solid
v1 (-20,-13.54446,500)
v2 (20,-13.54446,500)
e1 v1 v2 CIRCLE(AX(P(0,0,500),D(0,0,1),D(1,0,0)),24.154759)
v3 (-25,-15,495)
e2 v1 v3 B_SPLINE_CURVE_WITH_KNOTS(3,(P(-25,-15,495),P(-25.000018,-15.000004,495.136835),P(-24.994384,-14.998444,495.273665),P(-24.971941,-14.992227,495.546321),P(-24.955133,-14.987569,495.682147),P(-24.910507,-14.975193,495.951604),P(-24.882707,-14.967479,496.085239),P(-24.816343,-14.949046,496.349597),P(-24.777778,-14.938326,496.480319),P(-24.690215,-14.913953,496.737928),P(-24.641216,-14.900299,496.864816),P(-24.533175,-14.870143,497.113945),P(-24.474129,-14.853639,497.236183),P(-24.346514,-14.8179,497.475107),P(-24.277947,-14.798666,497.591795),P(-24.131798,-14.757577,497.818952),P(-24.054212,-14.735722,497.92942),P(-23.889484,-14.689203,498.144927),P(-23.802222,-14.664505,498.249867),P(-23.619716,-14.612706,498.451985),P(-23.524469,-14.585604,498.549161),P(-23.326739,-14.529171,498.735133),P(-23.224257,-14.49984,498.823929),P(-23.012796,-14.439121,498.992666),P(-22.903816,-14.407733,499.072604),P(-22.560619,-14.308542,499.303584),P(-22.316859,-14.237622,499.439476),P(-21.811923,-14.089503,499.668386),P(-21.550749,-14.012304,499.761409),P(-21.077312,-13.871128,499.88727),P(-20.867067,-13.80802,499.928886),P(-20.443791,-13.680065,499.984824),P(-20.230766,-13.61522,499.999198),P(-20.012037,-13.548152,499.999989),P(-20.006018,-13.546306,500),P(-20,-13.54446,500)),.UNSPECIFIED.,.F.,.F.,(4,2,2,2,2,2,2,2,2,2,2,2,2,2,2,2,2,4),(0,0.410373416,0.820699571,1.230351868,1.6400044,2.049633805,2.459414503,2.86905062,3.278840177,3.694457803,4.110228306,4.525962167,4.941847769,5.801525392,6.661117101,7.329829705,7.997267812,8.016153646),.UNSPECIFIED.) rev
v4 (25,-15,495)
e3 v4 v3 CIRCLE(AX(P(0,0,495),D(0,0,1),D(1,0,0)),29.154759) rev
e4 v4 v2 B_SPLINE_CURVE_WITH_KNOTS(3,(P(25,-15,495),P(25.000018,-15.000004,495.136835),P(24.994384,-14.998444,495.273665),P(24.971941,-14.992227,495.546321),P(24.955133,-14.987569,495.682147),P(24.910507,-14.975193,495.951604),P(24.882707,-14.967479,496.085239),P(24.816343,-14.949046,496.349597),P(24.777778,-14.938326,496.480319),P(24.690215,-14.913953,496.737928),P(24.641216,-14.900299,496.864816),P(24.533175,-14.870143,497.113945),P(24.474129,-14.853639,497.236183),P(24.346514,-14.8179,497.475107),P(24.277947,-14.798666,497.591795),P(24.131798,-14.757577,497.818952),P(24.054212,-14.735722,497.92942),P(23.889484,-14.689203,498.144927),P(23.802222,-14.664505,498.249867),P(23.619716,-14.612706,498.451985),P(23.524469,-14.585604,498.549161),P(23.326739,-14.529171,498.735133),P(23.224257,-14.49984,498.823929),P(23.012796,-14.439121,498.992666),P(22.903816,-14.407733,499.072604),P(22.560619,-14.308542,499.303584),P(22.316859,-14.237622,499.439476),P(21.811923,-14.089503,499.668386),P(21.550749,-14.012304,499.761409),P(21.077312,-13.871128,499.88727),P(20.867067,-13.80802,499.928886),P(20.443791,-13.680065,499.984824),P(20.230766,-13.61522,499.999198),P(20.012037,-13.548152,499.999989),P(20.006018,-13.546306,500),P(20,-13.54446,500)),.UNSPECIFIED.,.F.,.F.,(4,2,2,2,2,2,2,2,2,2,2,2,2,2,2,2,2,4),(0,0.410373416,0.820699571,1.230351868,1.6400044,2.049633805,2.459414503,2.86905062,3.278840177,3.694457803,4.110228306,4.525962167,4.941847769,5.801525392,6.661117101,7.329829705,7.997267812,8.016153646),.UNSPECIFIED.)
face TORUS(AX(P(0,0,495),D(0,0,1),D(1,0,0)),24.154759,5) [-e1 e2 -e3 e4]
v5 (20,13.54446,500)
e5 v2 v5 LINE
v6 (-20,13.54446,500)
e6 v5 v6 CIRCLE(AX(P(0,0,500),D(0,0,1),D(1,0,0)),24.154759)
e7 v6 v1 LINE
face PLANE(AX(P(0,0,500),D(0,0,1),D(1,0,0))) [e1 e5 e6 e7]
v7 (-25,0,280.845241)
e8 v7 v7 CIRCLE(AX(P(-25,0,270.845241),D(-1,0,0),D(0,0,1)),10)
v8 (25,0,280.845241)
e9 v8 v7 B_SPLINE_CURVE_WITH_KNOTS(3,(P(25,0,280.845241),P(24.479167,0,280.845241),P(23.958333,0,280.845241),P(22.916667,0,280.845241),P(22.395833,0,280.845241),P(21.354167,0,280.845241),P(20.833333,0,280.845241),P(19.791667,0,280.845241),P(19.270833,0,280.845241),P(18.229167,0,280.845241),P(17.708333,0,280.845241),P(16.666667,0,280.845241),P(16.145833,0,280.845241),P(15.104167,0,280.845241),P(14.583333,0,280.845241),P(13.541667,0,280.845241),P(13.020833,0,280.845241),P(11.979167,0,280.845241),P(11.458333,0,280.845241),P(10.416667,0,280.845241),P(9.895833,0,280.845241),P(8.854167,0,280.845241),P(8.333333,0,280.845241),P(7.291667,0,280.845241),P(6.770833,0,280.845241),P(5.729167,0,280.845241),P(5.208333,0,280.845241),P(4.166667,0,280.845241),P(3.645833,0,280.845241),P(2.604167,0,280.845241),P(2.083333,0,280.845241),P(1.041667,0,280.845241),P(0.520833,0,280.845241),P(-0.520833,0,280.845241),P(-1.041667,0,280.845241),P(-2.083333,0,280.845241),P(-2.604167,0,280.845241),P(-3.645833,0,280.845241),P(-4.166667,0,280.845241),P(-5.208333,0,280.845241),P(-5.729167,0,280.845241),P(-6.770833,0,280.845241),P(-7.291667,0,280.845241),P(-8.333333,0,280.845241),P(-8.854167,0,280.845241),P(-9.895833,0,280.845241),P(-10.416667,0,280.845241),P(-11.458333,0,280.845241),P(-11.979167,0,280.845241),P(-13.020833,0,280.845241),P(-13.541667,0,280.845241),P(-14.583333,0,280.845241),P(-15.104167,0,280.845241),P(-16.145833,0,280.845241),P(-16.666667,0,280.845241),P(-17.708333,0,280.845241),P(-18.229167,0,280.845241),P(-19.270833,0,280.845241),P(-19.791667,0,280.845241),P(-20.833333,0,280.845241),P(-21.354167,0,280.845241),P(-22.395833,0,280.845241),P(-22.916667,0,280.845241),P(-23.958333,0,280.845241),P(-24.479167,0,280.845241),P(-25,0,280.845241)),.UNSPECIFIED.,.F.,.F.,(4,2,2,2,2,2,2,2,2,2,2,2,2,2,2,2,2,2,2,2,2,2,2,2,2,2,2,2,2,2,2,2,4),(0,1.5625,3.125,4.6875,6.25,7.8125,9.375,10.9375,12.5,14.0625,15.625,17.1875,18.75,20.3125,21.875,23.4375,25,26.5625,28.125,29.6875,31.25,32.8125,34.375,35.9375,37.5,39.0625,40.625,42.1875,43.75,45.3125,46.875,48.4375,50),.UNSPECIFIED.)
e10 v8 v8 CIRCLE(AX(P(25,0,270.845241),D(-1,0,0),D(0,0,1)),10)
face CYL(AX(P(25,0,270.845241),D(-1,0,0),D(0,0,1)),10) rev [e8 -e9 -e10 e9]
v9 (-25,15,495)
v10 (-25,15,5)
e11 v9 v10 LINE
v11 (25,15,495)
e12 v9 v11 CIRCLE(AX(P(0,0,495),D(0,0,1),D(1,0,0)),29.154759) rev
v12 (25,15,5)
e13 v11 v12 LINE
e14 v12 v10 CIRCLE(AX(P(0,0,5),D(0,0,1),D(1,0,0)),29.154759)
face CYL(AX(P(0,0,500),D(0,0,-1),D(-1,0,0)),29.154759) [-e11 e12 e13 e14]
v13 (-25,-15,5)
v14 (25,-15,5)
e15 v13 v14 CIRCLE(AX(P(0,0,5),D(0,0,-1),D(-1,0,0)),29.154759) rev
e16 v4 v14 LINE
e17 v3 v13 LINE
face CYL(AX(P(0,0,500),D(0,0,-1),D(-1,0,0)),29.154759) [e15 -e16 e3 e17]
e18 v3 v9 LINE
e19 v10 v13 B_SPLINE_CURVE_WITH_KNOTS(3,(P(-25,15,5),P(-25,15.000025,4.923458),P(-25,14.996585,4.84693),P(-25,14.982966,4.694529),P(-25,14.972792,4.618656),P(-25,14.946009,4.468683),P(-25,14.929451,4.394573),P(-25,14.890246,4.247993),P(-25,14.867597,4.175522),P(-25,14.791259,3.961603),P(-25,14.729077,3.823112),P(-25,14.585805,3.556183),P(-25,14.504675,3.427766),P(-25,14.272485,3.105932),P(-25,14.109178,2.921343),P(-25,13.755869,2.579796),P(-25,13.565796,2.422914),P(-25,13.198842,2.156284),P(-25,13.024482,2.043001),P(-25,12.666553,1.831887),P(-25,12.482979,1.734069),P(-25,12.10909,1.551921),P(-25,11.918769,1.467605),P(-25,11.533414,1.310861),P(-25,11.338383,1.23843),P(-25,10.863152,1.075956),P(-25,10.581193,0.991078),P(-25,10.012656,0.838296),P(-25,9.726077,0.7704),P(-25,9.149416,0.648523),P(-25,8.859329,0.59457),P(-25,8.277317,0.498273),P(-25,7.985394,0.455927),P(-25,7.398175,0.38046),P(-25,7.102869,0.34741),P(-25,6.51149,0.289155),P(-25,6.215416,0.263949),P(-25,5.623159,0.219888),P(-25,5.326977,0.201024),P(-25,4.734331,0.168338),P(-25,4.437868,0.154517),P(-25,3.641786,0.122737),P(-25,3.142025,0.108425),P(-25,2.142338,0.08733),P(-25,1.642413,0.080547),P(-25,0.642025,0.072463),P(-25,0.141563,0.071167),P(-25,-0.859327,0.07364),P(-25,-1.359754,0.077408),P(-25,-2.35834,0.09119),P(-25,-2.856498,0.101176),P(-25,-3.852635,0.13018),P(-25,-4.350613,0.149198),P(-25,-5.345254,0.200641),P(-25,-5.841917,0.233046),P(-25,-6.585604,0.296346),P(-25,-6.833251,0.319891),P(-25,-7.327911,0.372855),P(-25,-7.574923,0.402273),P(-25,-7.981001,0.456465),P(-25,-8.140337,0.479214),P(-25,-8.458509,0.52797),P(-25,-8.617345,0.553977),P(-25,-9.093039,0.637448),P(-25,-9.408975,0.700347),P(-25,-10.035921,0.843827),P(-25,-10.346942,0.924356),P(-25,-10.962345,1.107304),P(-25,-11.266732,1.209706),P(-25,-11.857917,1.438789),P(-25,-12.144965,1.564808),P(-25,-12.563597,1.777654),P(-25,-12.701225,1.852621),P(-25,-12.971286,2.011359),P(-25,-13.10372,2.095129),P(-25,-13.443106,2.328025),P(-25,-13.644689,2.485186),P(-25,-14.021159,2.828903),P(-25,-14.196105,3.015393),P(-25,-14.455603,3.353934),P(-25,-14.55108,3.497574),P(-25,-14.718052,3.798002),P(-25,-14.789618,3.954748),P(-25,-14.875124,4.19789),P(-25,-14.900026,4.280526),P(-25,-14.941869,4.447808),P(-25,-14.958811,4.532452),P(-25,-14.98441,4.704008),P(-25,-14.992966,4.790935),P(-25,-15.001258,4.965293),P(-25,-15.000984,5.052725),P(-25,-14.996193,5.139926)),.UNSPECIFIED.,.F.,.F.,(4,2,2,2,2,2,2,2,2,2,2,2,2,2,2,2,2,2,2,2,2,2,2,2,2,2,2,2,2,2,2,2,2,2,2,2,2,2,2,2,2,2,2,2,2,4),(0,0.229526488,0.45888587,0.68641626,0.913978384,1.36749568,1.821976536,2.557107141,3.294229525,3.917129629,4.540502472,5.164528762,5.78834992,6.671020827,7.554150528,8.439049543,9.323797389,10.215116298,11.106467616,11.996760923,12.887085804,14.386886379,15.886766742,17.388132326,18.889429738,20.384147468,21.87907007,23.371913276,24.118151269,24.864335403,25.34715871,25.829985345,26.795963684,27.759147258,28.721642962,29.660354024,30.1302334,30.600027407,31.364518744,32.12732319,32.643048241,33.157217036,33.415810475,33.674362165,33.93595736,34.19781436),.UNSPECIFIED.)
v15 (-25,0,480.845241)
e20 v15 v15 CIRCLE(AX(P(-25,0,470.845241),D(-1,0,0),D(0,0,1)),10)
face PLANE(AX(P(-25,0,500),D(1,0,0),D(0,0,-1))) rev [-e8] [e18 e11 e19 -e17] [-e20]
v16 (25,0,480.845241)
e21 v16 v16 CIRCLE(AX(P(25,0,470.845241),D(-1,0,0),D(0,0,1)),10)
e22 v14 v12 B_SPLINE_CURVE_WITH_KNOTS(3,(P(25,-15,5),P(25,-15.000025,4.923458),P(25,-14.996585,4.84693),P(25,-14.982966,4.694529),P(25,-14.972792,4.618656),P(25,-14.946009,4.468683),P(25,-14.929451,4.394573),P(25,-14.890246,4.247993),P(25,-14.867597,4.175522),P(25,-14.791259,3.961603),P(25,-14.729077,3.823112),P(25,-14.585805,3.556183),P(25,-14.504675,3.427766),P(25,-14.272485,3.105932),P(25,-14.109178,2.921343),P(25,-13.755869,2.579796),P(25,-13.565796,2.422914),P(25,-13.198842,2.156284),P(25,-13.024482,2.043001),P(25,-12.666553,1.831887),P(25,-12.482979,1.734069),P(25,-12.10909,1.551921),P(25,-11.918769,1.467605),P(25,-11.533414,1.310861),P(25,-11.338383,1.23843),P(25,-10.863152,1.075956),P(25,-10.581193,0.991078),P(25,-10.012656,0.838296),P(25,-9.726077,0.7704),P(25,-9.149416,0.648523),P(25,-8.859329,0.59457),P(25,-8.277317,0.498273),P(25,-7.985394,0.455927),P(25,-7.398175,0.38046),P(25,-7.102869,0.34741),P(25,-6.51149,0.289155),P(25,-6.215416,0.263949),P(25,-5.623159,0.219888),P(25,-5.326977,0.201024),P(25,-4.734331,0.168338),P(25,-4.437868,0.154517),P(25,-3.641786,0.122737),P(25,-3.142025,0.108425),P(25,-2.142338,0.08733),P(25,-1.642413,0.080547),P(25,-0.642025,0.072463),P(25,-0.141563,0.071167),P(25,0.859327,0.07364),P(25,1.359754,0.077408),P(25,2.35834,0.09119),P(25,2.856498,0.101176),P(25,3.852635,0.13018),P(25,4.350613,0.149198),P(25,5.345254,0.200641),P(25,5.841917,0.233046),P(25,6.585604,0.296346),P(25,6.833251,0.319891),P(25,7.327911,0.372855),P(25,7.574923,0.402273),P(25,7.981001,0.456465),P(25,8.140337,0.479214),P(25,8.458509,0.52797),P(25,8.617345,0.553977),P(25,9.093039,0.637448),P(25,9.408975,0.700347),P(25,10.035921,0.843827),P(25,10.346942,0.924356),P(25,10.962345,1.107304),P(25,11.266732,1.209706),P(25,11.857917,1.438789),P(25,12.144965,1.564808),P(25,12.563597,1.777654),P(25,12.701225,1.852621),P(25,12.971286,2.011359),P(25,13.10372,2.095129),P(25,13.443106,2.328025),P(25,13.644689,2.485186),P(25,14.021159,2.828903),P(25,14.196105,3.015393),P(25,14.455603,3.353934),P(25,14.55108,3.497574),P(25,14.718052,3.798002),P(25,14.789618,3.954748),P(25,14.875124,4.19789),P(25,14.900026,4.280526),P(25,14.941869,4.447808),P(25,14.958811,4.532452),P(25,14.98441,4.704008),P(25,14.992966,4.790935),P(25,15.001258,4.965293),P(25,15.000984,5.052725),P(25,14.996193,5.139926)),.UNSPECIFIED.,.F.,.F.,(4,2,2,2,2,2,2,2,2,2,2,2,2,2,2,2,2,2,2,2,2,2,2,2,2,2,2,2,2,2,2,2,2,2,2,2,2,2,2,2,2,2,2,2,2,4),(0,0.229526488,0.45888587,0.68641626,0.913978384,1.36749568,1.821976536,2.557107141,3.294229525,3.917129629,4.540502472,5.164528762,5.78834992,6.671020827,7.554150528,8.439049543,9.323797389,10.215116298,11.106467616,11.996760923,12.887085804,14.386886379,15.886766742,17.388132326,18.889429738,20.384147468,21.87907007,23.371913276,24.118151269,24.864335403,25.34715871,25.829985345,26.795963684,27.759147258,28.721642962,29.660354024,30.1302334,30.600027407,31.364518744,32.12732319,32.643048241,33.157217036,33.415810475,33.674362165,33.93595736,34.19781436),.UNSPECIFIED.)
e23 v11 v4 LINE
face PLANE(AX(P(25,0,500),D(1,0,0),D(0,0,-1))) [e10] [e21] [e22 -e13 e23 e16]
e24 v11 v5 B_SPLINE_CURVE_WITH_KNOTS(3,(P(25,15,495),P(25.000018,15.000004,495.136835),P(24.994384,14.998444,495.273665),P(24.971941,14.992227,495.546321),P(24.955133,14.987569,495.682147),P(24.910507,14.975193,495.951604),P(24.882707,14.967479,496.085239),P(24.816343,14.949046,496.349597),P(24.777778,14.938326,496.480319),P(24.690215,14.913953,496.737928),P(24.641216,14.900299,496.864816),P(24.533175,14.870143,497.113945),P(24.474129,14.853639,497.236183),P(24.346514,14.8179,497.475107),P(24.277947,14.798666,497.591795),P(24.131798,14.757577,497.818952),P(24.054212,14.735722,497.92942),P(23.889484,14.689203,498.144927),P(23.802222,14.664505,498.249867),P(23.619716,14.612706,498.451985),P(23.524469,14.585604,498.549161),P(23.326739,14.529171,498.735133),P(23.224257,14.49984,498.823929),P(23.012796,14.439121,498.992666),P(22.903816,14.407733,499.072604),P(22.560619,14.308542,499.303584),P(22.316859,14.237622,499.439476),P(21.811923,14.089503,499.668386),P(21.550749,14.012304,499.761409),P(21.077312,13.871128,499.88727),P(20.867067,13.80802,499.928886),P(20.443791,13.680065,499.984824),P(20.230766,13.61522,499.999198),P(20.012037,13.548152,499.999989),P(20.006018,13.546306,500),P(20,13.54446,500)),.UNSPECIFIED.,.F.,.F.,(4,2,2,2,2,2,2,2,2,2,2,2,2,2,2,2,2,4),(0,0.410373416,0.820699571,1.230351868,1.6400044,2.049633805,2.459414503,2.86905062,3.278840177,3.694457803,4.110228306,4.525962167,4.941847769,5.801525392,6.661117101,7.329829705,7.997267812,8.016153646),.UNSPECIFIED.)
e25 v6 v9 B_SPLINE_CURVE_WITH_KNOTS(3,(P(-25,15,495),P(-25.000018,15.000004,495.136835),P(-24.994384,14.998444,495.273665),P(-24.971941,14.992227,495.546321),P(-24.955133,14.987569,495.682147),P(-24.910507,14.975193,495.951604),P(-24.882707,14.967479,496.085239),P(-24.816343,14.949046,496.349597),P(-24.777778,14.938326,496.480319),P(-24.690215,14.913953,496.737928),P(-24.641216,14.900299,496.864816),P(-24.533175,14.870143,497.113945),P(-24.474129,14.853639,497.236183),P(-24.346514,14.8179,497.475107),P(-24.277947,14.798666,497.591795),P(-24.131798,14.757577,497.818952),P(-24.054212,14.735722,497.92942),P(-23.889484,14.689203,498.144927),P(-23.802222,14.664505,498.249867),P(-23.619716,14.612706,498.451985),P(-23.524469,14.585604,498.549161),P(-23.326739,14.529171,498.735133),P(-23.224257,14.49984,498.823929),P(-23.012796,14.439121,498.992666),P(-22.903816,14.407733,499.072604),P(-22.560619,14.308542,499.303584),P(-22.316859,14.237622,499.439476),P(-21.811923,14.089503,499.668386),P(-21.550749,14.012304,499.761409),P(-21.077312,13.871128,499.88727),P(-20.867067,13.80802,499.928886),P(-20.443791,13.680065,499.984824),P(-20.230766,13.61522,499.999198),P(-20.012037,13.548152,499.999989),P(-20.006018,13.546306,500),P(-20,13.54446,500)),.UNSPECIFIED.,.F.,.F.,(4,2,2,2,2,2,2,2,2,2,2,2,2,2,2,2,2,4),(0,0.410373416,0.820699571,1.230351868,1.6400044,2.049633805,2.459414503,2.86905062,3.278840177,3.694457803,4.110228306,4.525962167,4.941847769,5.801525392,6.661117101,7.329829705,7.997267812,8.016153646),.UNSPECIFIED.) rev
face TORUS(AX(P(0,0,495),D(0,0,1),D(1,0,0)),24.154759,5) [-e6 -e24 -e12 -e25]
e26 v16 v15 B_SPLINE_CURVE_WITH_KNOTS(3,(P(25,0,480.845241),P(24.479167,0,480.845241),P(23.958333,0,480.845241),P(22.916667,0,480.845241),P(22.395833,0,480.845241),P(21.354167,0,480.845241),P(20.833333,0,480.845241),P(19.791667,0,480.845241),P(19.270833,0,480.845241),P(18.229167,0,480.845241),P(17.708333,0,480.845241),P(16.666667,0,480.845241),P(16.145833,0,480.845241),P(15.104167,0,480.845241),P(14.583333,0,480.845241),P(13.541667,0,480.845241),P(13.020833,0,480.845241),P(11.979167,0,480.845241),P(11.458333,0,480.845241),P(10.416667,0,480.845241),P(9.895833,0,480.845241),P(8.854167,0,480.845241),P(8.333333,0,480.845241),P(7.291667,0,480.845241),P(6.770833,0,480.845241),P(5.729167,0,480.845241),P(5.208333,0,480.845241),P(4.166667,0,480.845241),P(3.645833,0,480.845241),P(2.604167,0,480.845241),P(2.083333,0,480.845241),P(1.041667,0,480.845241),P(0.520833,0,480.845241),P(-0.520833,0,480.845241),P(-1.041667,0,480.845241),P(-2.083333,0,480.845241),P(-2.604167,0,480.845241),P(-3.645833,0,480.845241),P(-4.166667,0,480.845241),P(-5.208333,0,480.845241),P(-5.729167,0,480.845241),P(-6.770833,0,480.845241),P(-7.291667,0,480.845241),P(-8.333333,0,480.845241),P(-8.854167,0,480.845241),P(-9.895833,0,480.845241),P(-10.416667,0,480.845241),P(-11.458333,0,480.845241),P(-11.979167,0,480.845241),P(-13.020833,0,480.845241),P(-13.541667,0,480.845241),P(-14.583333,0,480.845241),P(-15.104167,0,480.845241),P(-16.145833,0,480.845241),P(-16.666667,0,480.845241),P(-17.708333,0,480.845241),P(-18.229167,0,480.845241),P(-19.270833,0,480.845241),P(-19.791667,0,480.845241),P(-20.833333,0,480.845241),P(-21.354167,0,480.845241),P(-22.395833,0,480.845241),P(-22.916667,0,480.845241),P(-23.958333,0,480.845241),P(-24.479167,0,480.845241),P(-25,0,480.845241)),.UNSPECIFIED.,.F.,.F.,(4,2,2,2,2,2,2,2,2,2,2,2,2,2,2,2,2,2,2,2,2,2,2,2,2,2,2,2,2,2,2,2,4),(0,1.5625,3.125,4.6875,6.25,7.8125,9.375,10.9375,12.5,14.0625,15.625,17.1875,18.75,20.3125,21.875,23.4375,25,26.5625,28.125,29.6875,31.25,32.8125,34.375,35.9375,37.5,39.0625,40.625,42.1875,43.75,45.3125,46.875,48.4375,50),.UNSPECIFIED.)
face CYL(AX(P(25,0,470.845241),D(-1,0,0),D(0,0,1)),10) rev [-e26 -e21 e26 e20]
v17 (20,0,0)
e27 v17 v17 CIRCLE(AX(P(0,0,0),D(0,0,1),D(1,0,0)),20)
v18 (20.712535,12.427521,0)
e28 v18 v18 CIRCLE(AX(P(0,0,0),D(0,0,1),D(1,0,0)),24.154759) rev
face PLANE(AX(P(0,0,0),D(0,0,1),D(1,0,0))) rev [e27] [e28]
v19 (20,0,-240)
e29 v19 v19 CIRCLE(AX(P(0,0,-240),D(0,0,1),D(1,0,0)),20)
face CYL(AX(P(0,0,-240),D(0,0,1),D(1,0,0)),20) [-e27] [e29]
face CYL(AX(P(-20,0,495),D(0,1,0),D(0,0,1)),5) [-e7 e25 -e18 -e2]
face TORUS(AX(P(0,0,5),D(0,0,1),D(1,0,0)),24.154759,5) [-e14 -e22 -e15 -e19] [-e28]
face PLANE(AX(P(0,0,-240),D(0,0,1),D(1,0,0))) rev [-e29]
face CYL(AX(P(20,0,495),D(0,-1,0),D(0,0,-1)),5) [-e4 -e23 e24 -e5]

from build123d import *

# Parameters (mm, degrees)
ESQUISSE1_R             = 20
BOSS_EXTRU_1_DEPTH      = 500
ESQUISSE1_4_R           = 20
BOSS_EXTRU_2_DEPTH      = 240
ESQUISSE2_R             = 10
ENL_V_MAT_EXTRU_1_DEPTH = 504.338852067
CONG_1_R                = 5


with BuildPart() as part:
    # Esquisse1 → Boss.-Extru.1 (new body)
    # profile 1 of 2: a face of its own
    with BuildSketch(Plane.XY):
        with BuildLine():
            ThreePointArc((25, 15), (0, 29.154759474), (-25, 15))
            Line((-25, 15), (-25, -15))
            ThreePointArc((-25, -15), (0, -29.154759474), (25, -15))
            Line((25, -15), (25, 15))
        make_face()
        Circle(ESQUISSE1_R, mode=Mode.SUBTRACT)
    # profile 2 of 2: a face of its own
    with BuildSketch(Plane.XY):
        Circle(ESQUISSE1_R)
    extrude(amount=BOSS_EXTRU_1_DEPTH)

    # Esquisse1<4> → Boss.-Extru.2 (add)
    with BuildSketch(Plane.XY):
        Circle(ESQUISSE1_4_R)
    extrude(amount=-BOSS_EXTRU_2_DEPTH)

    # Esquisse2 → Enlèv. mat.-Extru.1 (cut, through all)
    with BuildSketch(Plane.ZY.offset(25)):
        with Locations((470.845240526, 0)):
            Circle(ESQUISSE2_R)
        with Locations((270.845240526, 0)):
            Circle(ESQUISSE2_R)
    extrude(amount=-ENL_V_MAT_EXTRU_1_DEPTH, mode=Mode.SUBTRACT)

    # Congé1
    # the kernel refuses this fillet: 5 mm, written as the material it takes off along each edge
    with BuildSketch(Plane(origin=(0, 0, 500), x_dir=(0.8826697936069986, -0.46999365469522936, 0), z_dir=(-0.46999365469522936, -0.8826697936069986, 0))) as cong_1_piece_1:
        with BuildLine():
            CenterArc((29.154759474 - CONG_1_R, -CONG_1_R), CONG_1_R, 0, 90)
            Line((29.154759474, -CONG_1_R), (29.154759474 + CONG_1_R * 0.02, -CONG_1_R))
            Line((29.154759474 + CONG_1_R * 0.02, -CONG_1_R), (29.154759474 + CONG_1_R * 0.02, CONG_1_R * 0.02))
            Line((29.154759474 + CONG_1_R * 0.02, CONG_1_R * 0.02), (29.154759474 - CONG_1_R, CONG_1_R * 0.02))
            Line((29.154759474 - CONG_1_R, CONG_1_R * 0.02), (29.154759474 - CONG_1_R, 0))
        make_face()
    revolve(axis=Axis((0, 0, 500), (0, 0, 1)), revolution_arc=236.067769297, mode=Mode.SUBTRACT)
    with BuildSketch(Plane(origin=(0, 0, 500), x_dir=(-0.8826697936069986, 0.4699936546952294, 0), z_dir=(0.4699936546952294, 0.8826697936069986, 0))) as cong_1_piece_2:
        with BuildLine():
            CenterArc((29.154759474 - CONG_1_R, -CONG_1_R), CONG_1_R, 0, 90)
            Line((29.154759474 - CONG_1_R, 0), (29.154759474 - CONG_1_R, CONG_1_R * 0.02))
            Line((29.154759474 - CONG_1_R, CONG_1_R * 0.02), (29.154759474 + CONG_1_R * 0.02, CONG_1_R * 0.02))
            Line((29.154759474 + CONG_1_R * 0.02, CONG_1_R * 0.02), (29.154759474 + CONG_1_R * 0.02, -CONG_1_R))
            Line((29.154759474 + CONG_1_R * 0.02, -CONG_1_R), (29.154759474, -CONG_1_R))
        make_face()
    revolve(axis=Axis((0, 0, 500), (0, 0, 1)), revolution_arc=236.067769297, mode=Mode.SUBTRACT)
    with BuildSketch(Plane(origin=(-25, 45, 500), x_dir=(0, 0, -1), z_dir=(0, -1, 0)), Plane(origin=(25, -45, 500), x_dir=(0, 0, -1), z_dir=(0, 1, 0))) as cong_1_piece_3:
        with BuildLine():
            CenterArc((CONG_1_R, CONG_1_R), CONG_1_R, 180, 90)
            Line((0, CONG_1_R), (-CONG_1_R * 0.02, CONG_1_R))
            Line((-CONG_1_R * 0.02, CONG_1_R), (-CONG_1_R * 0.02, -CONG_1_R * 0.02))
            Line((-CONG_1_R * 0.02, -CONG_1_R * 0.02), (CONG_1_R, -CONG_1_R * 0.02))
            Line((CONG_1_R, -CONG_1_R * 0.02), (CONG_1_R, 0))
        make_face()
    extrude(amount=90, mode=Mode.SUBTRACT)
    with BuildSketch(Plane(origin=(0, 0, 0), x_dir=(-0.8826697936069986, 0.4699936546952294, 0), z_dir=(0.4699936546952294, 0.8826697936069986, 0))) as cong_1_piece_4:
        with BuildLine():
            CenterArc((29.154759474 - CONG_1_R, CONG_1_R), CONG_1_R, 270, 90)
            Line((29.154759474 - CONG_1_R, 0), (29.154759474 - CONG_1_R, -CONG_1_R * 0.02))
            Line((29.154759474 - CONG_1_R, -CONG_1_R * 0.02), (29.154759474 + CONG_1_R * 0.02, -CONG_1_R * 0.02))
            Line((29.154759474 + CONG_1_R * 0.02, -CONG_1_R * 0.02), (29.154759474 + CONG_1_R * 0.02, CONG_1_R))
            Line((29.154759474 + CONG_1_R * 0.02, CONG_1_R), (29.154759474, CONG_1_R))
        make_face()
    revolve(axis=Axis((0, 0, 0), (0, 0, 1)), revolution_arc=236.067769297, mode=Mode.SUBTRACT)
    with BuildSketch(Plane(origin=(0, 0, 0), x_dir=(0.8826697936069986, -0.46999365469522936, 0), z_dir=(-0.46999365469522936, -0.8826697936069986, 0))) as cong_1_piece_5:
        with BuildLine():
            CenterArc((29.154759474 - CONG_1_R, CONG_1_R), CONG_1_R, 270, 90)
            Line((29.154759474, CONG_1_R), (29.154759474 + CONG_1_R * 0.02, CONG_1_R))
            Line((29.154759474 + CONG_1_R * 0.02, CONG_1_R), (29.154759474 + CONG_1_R * 0.02, -CONG_1_R * 0.02))
            Line((29.154759474 + CONG_1_R * 0.02, -CONG_1_R * 0.02), (29.154759474 - CONG_1_R, -CONG_1_R * 0.02))
            Line((29.154759474 - CONG_1_R, -CONG_1_R * 0.02), (29.154759474 - CONG_1_R, 0))
        make_face()
    revolve(axis=Axis((0, 0, 0), (0, 0, 1)), revolution_arc=236.067769297, mode=Mode.SUBTRACT)


solid = part.part
